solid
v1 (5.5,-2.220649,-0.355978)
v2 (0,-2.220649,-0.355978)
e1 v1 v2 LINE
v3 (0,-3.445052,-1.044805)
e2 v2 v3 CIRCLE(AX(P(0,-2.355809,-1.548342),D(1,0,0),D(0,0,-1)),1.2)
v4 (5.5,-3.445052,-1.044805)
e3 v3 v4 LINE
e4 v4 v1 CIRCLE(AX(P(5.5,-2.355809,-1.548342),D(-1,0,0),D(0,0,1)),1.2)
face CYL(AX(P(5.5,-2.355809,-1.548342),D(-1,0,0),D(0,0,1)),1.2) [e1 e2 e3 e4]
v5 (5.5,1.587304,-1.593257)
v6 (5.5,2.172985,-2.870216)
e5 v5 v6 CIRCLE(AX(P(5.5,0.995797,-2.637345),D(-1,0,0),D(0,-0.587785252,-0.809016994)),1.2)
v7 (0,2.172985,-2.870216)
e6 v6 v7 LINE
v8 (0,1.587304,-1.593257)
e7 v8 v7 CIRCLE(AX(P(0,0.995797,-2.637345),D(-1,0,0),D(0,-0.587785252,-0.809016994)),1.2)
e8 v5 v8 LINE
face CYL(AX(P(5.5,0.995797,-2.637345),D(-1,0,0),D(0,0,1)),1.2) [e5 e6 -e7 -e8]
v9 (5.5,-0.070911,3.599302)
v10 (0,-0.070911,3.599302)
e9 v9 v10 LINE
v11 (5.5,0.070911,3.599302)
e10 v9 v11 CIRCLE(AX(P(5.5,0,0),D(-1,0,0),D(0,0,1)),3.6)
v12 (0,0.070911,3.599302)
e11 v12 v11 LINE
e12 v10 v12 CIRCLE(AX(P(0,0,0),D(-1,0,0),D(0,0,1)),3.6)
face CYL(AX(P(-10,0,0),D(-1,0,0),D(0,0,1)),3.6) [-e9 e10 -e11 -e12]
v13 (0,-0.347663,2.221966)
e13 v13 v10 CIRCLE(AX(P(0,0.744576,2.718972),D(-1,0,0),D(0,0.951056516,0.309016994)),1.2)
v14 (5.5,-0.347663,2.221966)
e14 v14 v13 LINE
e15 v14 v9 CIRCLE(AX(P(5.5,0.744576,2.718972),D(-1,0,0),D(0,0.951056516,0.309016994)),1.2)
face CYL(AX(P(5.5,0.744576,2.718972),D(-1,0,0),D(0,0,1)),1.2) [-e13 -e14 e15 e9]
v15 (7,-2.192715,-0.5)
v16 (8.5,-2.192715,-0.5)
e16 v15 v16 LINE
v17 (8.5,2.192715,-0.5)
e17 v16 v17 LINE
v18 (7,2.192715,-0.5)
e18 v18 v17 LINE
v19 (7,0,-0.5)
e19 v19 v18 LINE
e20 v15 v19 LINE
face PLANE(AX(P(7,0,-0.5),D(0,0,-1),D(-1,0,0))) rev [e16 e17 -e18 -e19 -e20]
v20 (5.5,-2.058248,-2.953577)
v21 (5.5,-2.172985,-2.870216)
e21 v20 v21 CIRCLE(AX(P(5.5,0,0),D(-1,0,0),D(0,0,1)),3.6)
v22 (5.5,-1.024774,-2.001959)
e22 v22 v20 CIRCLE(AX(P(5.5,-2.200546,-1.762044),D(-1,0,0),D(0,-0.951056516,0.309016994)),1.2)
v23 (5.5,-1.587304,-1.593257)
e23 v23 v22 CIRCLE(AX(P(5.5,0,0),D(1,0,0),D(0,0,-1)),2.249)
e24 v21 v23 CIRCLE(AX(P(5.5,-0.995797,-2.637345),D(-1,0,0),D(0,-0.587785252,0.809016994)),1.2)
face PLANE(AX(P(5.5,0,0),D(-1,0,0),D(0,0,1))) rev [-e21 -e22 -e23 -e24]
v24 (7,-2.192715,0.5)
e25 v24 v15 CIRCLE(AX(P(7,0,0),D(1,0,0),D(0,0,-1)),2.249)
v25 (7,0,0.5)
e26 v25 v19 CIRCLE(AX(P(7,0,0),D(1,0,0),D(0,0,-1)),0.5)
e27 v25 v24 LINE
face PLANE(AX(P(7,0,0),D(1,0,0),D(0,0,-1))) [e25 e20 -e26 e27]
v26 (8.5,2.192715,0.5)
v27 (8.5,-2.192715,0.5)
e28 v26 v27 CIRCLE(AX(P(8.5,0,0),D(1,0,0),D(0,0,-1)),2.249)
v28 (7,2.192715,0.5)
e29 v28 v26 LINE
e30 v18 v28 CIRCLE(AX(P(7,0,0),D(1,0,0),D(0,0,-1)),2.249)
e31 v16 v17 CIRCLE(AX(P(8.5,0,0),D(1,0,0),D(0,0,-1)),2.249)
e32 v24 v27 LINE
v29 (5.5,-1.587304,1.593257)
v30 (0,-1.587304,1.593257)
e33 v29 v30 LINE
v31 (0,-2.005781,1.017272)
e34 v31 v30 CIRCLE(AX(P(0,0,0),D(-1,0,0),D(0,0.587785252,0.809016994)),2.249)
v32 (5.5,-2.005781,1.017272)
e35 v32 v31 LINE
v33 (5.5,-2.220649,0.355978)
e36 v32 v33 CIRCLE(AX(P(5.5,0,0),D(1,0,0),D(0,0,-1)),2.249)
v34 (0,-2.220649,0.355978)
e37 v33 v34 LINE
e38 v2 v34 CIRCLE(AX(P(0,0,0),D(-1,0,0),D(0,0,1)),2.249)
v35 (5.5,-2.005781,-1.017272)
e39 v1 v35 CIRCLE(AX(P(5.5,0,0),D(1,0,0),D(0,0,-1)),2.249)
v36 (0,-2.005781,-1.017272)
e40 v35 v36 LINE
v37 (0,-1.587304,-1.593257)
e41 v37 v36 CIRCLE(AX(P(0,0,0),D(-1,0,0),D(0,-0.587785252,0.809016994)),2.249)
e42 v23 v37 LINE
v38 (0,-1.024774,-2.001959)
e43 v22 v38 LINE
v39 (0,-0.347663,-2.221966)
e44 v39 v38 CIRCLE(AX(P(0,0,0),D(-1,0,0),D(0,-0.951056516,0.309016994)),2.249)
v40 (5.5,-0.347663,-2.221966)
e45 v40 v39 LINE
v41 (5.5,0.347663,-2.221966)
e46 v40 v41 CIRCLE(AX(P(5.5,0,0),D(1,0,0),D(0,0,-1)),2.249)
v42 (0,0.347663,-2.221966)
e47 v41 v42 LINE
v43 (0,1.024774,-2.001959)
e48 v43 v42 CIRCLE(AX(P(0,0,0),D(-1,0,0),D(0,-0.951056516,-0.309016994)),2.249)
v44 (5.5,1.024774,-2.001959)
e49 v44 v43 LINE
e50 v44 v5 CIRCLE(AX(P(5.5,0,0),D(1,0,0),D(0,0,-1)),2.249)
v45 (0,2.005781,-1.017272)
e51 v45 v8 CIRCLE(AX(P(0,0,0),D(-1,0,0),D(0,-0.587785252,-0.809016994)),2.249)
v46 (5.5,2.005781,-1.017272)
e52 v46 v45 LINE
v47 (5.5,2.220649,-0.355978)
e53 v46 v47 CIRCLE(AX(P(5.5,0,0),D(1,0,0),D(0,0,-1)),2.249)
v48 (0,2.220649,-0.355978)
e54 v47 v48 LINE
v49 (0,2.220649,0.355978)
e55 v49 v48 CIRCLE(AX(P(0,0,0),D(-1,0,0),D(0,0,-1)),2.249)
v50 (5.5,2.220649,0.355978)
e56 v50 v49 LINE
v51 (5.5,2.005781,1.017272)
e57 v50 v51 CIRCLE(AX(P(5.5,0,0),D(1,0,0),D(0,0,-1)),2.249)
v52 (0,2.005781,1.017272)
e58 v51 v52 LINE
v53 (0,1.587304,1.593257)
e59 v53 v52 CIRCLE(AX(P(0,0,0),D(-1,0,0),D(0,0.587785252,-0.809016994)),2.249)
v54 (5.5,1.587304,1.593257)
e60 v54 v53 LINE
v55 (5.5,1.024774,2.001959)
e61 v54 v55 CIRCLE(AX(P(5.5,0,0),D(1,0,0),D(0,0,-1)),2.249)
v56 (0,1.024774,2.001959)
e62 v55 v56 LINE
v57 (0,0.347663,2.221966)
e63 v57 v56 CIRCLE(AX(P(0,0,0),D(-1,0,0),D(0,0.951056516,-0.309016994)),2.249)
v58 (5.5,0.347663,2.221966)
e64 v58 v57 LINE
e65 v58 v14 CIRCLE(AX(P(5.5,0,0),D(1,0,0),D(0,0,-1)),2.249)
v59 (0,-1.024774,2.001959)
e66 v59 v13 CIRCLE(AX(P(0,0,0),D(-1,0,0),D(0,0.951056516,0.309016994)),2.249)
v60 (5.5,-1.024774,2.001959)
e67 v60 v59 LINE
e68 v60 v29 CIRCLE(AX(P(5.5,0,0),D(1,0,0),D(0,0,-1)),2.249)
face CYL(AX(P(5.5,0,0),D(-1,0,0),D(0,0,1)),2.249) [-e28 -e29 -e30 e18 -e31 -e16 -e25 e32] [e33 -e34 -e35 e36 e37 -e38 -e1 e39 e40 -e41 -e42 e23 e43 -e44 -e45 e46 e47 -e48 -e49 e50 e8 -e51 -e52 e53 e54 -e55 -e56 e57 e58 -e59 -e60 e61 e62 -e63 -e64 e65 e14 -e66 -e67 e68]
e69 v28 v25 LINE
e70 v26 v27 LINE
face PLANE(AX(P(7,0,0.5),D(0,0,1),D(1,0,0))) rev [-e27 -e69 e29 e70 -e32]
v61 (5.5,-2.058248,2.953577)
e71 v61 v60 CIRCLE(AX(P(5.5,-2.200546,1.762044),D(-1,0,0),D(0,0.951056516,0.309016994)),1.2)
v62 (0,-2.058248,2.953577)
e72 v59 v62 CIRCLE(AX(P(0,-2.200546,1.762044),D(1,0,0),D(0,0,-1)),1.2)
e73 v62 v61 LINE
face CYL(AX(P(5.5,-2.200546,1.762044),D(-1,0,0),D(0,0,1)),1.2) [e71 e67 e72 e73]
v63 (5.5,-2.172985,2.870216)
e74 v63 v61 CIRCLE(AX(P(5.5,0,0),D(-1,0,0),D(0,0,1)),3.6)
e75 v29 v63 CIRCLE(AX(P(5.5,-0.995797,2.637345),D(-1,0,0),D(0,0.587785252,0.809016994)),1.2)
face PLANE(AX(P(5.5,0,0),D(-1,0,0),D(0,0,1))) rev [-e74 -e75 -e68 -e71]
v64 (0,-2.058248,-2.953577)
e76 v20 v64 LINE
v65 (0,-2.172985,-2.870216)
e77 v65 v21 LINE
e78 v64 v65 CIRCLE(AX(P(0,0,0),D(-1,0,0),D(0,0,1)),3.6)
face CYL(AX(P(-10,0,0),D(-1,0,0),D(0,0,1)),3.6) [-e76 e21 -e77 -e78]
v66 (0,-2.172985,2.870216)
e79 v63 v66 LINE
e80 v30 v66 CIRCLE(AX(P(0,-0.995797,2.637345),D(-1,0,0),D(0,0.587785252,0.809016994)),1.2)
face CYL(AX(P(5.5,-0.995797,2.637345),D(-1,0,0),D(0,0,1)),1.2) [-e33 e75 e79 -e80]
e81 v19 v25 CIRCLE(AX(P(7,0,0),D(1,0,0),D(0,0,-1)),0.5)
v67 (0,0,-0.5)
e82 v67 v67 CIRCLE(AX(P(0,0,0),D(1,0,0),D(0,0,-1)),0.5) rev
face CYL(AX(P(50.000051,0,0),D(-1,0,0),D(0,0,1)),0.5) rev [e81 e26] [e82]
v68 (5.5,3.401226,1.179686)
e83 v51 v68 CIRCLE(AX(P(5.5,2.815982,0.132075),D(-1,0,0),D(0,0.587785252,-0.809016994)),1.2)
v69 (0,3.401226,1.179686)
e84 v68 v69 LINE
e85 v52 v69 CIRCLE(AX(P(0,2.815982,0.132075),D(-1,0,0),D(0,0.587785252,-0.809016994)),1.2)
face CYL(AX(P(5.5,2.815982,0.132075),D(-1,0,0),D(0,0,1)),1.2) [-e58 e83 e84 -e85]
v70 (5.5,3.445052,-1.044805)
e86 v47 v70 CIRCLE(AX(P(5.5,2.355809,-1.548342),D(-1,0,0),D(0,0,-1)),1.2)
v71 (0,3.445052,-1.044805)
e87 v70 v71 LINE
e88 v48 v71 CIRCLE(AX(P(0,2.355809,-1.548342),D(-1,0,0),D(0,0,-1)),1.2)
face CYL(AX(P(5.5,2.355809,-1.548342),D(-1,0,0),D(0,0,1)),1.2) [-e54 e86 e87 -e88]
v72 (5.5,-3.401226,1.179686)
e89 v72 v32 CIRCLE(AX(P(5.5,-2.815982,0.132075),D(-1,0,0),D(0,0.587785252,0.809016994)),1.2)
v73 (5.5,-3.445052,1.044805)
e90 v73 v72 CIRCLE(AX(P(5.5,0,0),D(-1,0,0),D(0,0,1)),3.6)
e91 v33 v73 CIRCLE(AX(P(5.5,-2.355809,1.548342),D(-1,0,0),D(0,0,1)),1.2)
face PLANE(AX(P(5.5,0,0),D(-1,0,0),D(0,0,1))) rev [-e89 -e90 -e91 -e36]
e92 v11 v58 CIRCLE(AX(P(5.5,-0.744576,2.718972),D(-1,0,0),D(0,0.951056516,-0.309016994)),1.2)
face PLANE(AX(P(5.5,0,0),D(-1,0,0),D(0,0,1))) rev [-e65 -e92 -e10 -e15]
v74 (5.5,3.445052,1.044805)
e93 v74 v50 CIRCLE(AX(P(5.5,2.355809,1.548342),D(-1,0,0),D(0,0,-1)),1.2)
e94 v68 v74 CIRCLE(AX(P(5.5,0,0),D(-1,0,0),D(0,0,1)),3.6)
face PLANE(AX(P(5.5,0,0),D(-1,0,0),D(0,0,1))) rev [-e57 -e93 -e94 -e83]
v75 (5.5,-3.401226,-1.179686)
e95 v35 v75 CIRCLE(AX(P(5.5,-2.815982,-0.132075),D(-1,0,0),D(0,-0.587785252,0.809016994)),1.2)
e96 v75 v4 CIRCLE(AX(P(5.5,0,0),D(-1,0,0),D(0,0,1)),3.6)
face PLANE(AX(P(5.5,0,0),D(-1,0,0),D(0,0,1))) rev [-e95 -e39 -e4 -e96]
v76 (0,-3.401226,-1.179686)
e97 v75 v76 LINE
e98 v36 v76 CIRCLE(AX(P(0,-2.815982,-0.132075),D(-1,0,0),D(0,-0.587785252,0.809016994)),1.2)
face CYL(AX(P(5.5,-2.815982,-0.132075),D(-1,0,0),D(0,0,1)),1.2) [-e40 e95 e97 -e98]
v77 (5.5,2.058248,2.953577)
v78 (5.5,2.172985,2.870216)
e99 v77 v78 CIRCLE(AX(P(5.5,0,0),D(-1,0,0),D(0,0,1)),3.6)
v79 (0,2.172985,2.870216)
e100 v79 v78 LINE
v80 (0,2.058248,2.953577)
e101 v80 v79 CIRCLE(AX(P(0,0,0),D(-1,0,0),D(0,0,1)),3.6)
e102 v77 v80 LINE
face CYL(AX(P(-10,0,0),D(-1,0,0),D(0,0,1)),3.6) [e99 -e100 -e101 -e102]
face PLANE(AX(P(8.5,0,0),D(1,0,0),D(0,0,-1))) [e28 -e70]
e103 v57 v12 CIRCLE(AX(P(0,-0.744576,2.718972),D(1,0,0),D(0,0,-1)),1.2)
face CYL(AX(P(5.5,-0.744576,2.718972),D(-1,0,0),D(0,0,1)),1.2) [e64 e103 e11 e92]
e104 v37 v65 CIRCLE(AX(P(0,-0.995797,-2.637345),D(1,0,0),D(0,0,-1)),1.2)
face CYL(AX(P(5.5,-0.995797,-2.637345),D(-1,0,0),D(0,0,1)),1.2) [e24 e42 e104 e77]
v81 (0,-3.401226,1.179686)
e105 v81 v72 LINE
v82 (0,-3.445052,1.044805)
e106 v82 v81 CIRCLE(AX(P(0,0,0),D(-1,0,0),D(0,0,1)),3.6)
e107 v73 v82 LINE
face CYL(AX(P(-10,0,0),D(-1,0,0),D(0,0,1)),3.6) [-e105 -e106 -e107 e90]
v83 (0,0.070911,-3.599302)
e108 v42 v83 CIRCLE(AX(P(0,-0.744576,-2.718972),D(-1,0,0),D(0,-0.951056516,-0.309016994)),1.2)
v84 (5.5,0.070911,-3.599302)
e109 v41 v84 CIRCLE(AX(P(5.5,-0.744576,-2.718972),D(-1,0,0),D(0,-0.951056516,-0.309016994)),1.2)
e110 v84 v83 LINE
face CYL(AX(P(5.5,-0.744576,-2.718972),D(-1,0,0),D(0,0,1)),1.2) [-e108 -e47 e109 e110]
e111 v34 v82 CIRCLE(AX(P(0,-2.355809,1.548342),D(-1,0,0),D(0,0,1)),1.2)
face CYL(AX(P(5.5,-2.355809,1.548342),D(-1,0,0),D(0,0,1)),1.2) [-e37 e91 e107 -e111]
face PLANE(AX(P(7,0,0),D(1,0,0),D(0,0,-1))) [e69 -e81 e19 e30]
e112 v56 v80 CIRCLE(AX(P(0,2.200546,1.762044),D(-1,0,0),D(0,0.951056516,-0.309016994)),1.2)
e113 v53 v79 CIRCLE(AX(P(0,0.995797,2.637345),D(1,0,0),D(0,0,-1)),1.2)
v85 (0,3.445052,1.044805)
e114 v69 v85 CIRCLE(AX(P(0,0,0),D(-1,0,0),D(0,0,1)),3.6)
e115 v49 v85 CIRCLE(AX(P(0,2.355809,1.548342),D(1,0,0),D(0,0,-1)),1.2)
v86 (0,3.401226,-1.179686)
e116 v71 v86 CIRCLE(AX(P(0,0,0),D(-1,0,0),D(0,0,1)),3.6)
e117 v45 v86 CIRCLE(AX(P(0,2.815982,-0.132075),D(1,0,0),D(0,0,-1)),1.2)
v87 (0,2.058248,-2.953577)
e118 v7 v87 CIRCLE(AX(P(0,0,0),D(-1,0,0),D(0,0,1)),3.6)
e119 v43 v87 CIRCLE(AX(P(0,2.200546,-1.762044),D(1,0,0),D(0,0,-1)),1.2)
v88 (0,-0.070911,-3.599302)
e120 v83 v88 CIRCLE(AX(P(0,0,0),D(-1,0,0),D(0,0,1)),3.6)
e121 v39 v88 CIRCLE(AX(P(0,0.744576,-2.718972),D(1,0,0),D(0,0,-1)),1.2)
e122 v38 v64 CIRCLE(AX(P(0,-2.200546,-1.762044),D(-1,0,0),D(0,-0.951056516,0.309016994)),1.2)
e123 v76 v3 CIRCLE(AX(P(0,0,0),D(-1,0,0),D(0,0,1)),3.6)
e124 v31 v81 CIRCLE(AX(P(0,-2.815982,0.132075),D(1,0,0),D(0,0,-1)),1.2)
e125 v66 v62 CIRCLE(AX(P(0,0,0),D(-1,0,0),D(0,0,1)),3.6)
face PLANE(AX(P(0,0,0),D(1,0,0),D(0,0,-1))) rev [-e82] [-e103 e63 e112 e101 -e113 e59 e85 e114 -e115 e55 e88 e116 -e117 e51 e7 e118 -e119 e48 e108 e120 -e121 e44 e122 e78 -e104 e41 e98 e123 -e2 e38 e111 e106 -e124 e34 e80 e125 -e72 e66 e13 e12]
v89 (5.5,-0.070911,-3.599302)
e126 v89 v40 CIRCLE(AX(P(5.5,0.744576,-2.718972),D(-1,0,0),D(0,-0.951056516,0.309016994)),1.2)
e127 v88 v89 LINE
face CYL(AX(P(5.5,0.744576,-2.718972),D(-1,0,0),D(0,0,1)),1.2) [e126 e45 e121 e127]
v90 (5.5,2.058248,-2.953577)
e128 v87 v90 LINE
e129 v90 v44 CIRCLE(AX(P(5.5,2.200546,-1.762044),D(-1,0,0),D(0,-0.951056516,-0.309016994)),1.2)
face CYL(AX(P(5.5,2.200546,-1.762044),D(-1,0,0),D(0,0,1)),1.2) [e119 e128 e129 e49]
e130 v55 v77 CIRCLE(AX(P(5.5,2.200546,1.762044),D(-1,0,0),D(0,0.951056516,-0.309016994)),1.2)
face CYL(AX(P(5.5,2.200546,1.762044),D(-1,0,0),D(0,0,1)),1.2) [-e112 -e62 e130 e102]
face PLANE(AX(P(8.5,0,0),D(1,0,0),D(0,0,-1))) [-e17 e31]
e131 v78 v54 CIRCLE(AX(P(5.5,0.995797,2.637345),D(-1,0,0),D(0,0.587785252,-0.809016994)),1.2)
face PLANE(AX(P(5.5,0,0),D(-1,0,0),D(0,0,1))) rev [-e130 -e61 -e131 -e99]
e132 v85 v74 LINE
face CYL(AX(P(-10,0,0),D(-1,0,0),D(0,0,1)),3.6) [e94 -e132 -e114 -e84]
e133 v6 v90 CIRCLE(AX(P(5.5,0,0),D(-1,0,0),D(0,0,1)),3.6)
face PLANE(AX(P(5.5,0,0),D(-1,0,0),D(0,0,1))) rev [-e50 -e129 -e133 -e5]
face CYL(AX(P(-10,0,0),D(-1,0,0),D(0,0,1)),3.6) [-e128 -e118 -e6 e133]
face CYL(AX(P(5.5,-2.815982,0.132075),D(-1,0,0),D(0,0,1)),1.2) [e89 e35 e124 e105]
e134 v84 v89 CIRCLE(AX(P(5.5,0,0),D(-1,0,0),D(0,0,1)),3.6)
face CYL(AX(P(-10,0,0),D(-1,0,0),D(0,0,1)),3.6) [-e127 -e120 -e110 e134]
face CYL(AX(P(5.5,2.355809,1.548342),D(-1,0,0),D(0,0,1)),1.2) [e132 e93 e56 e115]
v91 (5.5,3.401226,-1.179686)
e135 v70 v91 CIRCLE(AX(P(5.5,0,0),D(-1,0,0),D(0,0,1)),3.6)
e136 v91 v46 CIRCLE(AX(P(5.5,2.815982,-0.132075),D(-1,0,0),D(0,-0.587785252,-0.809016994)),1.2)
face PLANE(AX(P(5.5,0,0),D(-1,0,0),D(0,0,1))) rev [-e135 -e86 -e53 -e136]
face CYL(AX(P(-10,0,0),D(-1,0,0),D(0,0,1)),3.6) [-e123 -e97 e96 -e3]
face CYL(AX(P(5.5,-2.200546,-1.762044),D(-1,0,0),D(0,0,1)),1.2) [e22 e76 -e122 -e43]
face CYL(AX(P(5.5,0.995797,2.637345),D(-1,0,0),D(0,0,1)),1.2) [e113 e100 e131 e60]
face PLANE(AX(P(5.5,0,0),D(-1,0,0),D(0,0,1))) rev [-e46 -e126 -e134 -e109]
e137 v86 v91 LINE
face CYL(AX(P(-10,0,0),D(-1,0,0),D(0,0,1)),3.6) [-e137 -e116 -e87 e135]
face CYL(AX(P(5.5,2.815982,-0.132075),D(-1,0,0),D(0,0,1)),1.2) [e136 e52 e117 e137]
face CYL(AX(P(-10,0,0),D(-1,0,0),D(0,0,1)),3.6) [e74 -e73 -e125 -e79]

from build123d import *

# Parameters (mm, degrees)
BASPROSKE_W         = 5.5
BASPROSKE_H         = 3.6
TOOTHCUT_DEPTH      = 8.494664769
TEETHCUTS_COUNT     = 10
TEETHCUTS_ANGLE     = 324
BORSKE_R            = 0.5
BORE_DEPTH          = 50.0000508
SKETCH_1_R          = 2.249
SKETCH_1_R_2        = 0.5
EXTRUDE_1_DEPTH     = 3
CUT_EXTRUDE_START   = -1.5
CUT_EXTRUDE_1_DEPTH = 1.5


with BuildPart() as part:
    # BasProSke → Base-Revolve (revolve)
    with BuildSketch(Plane(origin=(0, 0, 0), x_dir=(1, 0, 0), z_dir=(0, 1, 0))):
        with Locations((2.75, 1.8)):
            Rectangle(BASPROSKE_W, BASPROSKE_H)
    revolve(axis=Axis((-10, 0, 0), (1, 0, 0)))

    # TooCutSke → ToothCut (cut, through all)
    with BuildSketch(Plane(origin=(0, 0, 0), x_dir=(0, 0, -1), z_dir=(1, 0, 0))):
        with BuildLine():
            ThreePointArc((0.355978269, 2.22064866), (0, 2.249), (-0.355978269, 2.22064866))
            ThreePointArc((-0.355978269, 2.22064866), (-0.512117582, 2.960985626), (-1.080212515, 3.460732015))
            ThreePointArc((-1.080212515, 3.460732015), (0, 3.6254), (1.080212515, 3.460732015))
            ThreePointArc((1.080212515, 3.460732015), (0.512117582, 2.960985626), (0.355978269, 2.22064866))
        make_face()
    toothcut = extrude(amount=TOOTHCUT_DEPTH, mode=Mode.SUBTRACT)

    # TeethCuts: ToothCut ×10 about axis
    teethcuts_axis = Axis((-10, 0, 0), (1, 0, 0))
    for i in range(1, TEETHCUTS_COUNT):
        add(toothcut.rotate(teethcuts_axis, i * TEETHCUTS_ANGLE / (TEETHCUTS_COUNT - 1)), mode=Mode.SUBTRACT)

    # BorSke → Bore (cut, symmetric)
    with BuildSketch(Plane(origin=(0, 0, 0), x_dir=(0, 0, -1), z_dir=(1, 0, 0))):
        Circle(BORSKE_R)
    extrude(amount=BORE_DEPTH, both=True, mode=Mode.SUBTRACT)

    # 草图1 → 凸台-拉伸1 (add)
    with BuildSketch(Plane(origin=(5.5, 0, 0), x_dir=(0, 0, -1), z_dir=(1, 0, 0))):
        Circle(SKETCH_1_R)
        Circle(SKETCH_1_R_2, mode=Mode.SUBTRACT)
    extrude(amount=EXTRUDE_1_DEPTH)

    # 草图2 → 切除-拉伸1 (cut)
    with BuildSketch(Plane(origin=(8.5, 0, 0), x_dir=(0, 0, -1), z_dir=(1, 0, 0)).offset(CUT_EXTRUDE_START)):
        with BuildLine():
            Line((-0.5, 0), (-0.5, -2.19271544))
            ThreePointArc((-0.5, -2.19271544), (0, -2.249), (0.5, -2.19271544))
            Line((0.5, -2.19271544), (0.5, 0))
            Line((0.5, 0), (0.5, 2.19271544))
            ThreePointArc((0.5, 2.19271544), (0, 2.249), (-0.5, 2.19271544))
            Line((-0.5, 2.19271544), (-0.5, 0))
        make_face()
    extrude(amount=CUT_EXTRUDE_1_DEPTH, mode=Mode.SUBTRACT)


solid = part.part
